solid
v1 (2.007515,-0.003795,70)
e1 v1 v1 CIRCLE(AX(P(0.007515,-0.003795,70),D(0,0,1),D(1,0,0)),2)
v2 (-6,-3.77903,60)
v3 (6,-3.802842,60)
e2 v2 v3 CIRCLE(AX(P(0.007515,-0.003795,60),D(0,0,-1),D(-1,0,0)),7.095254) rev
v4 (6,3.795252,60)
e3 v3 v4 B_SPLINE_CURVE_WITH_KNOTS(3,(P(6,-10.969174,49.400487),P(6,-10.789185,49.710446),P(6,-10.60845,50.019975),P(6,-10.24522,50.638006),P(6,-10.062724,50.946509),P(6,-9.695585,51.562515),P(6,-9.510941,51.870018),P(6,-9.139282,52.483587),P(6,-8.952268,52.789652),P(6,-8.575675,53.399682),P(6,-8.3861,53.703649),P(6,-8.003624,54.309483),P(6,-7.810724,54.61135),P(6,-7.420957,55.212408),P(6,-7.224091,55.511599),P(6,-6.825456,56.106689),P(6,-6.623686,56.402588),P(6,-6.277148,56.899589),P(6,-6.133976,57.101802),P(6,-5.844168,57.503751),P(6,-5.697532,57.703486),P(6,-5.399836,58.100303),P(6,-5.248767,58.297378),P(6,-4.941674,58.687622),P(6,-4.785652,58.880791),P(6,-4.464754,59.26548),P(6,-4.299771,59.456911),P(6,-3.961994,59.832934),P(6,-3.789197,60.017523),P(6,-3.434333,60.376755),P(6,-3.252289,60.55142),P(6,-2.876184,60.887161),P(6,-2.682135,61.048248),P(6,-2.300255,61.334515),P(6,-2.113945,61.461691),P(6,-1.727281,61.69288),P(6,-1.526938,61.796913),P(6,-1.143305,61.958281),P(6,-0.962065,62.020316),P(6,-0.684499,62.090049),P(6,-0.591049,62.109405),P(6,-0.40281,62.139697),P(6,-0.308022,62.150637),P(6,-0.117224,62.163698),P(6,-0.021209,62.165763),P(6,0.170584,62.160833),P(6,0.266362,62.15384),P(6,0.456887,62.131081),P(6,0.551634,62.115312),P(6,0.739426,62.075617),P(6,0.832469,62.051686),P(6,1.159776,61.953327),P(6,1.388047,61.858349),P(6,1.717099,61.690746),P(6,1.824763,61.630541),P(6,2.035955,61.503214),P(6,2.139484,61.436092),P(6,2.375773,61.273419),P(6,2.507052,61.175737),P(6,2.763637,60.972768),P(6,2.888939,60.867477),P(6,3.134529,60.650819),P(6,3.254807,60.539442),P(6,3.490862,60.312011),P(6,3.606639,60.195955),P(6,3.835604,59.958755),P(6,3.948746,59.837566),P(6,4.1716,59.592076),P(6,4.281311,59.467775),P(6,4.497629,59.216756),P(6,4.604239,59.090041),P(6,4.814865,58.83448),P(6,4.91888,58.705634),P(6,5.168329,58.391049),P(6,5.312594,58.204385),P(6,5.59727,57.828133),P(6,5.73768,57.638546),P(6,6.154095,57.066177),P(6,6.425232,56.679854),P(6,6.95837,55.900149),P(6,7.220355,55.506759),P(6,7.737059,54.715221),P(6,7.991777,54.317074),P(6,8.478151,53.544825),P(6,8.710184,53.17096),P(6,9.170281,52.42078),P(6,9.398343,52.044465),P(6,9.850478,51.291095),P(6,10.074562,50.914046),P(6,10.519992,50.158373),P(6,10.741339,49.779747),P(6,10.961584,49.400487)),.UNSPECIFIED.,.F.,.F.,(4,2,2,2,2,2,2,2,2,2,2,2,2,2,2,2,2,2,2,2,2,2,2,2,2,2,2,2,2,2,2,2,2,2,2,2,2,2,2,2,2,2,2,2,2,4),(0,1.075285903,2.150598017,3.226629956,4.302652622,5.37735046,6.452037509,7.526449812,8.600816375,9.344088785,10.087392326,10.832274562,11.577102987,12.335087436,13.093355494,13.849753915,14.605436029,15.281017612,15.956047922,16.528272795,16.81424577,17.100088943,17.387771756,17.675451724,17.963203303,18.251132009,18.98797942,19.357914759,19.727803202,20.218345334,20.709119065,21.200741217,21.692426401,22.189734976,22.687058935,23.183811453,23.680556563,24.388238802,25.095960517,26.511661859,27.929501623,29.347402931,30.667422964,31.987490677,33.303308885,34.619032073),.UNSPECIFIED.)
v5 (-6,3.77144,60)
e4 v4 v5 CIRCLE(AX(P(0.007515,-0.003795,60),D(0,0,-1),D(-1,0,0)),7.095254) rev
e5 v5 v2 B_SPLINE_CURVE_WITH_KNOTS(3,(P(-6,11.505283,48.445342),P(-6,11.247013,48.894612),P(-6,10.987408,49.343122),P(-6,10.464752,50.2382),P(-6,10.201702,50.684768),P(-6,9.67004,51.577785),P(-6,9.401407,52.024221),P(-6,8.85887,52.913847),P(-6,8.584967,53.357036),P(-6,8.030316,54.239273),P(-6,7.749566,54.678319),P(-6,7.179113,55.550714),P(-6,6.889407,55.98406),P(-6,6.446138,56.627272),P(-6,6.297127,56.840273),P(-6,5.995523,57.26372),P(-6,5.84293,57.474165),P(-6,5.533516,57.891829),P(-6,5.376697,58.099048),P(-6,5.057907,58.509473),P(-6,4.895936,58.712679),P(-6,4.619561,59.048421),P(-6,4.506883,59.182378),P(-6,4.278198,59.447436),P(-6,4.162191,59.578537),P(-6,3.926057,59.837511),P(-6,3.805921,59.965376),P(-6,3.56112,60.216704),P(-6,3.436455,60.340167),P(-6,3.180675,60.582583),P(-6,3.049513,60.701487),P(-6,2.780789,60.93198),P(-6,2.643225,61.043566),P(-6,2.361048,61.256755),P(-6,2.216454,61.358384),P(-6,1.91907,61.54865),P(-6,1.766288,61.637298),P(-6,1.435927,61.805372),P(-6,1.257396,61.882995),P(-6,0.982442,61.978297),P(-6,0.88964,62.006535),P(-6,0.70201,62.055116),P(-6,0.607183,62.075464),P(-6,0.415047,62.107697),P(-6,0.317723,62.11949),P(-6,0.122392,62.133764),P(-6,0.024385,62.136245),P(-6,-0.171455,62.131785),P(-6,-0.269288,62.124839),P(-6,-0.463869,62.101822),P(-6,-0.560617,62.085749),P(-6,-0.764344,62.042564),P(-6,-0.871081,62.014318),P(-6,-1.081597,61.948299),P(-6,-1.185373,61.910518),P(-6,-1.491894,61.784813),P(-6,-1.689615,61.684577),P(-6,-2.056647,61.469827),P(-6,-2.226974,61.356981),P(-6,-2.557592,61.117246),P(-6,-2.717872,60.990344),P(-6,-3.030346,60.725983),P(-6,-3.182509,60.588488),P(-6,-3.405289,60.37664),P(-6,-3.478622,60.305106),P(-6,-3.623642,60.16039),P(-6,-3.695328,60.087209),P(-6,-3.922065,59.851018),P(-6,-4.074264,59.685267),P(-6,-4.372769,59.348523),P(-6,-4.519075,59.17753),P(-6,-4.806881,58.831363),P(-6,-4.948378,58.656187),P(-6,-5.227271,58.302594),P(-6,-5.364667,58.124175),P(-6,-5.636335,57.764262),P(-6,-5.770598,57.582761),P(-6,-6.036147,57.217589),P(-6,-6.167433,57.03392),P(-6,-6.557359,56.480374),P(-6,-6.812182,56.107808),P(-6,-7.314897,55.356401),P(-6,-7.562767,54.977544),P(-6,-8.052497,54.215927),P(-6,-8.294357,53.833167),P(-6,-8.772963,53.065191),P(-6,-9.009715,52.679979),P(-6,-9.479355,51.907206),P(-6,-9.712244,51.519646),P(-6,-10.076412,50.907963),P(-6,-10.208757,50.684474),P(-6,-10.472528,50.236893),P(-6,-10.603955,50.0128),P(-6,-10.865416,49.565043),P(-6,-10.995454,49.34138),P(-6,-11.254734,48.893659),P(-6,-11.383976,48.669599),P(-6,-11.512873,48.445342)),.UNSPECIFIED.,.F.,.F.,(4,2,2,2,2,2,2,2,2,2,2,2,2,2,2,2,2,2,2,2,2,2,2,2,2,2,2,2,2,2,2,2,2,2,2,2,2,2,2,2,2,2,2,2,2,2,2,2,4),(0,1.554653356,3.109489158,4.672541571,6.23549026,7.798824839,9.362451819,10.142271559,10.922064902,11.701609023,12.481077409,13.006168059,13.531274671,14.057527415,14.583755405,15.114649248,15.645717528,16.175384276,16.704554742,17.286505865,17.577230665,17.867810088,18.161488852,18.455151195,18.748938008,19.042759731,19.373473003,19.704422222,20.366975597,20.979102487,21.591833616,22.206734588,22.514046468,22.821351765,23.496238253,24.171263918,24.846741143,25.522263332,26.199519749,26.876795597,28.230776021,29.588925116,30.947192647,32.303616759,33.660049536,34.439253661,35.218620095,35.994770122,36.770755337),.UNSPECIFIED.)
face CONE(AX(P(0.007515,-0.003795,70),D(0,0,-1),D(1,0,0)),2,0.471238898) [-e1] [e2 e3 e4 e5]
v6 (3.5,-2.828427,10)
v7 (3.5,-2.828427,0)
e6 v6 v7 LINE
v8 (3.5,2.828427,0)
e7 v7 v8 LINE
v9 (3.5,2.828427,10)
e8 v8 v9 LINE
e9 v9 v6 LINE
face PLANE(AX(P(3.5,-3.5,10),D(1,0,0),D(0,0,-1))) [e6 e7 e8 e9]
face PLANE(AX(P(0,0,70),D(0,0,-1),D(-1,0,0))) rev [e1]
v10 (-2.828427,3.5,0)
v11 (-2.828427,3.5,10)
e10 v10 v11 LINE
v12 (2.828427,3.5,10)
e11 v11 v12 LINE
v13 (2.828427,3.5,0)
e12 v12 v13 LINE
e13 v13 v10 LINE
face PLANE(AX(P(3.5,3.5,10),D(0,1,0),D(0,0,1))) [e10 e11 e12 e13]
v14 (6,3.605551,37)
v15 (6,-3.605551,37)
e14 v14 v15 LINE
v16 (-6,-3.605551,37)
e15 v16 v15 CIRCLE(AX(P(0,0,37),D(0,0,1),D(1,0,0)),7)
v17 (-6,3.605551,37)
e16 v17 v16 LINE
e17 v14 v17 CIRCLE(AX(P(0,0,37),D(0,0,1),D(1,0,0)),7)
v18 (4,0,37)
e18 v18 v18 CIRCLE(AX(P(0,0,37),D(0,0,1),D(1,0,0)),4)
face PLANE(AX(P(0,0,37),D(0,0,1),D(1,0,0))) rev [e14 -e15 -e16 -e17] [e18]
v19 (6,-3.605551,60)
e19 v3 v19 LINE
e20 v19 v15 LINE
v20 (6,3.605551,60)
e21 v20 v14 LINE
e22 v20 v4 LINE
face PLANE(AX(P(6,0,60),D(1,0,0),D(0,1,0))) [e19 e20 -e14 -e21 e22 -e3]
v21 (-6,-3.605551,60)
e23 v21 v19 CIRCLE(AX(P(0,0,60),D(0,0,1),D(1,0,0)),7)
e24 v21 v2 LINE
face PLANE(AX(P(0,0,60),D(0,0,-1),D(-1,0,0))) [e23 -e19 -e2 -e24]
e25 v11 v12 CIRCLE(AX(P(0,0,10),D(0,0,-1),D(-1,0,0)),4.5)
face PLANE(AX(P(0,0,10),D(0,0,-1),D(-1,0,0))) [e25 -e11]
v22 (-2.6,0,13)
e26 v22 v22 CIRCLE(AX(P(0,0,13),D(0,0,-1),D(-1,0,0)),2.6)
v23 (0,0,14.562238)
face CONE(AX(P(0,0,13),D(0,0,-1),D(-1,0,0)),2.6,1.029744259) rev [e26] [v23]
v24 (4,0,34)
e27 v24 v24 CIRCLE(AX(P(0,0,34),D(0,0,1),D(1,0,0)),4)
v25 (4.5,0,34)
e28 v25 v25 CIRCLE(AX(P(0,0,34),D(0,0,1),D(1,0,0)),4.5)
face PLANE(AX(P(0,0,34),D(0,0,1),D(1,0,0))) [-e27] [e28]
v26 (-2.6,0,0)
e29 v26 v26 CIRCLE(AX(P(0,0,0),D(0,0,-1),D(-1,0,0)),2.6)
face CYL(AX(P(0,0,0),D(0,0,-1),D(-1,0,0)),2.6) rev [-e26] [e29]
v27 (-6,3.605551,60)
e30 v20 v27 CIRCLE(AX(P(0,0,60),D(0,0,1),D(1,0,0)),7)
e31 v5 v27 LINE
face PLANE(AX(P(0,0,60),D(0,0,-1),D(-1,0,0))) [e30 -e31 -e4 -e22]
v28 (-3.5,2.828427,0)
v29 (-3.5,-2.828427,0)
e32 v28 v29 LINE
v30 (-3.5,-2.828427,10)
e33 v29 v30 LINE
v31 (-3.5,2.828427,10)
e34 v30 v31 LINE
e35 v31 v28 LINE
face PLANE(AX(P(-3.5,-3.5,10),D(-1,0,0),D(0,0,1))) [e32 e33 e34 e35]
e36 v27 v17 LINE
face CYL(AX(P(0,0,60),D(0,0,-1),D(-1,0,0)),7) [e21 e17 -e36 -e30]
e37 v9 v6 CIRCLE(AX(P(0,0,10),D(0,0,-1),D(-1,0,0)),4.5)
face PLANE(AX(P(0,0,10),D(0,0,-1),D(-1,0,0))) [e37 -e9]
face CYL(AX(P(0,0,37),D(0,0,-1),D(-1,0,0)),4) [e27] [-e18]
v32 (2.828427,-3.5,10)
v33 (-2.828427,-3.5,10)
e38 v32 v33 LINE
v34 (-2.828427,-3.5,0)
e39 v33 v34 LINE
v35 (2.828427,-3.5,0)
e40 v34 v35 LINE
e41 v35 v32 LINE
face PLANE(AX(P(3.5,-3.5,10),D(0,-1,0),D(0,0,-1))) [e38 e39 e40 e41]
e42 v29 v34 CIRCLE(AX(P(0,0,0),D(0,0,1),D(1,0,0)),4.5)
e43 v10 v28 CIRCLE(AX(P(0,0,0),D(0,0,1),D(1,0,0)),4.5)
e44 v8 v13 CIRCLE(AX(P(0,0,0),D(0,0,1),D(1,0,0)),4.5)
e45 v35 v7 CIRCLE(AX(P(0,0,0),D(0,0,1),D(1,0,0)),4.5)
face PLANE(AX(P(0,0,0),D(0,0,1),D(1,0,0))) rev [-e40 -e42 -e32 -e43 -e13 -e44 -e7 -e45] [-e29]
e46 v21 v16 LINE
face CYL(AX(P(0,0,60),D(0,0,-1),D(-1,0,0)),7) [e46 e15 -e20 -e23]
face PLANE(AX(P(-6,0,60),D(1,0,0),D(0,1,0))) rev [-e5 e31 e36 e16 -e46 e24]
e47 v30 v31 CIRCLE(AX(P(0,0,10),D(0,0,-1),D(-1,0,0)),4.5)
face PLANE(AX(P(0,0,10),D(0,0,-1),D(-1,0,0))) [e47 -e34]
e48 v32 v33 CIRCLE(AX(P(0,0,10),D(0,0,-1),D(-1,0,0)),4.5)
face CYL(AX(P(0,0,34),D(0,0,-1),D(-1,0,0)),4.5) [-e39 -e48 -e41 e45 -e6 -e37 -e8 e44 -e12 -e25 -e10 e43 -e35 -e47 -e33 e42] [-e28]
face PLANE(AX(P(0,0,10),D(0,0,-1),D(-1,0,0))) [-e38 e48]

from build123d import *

# Parameters (mm, degrees)
SKETCH_1_R            = 4.5
EXTRUDE_1_DEPTH       = 34
SKETCH_2_R            = 4
EXTRUDE_2_DEPTH       = 3
EXTRUDE_3_DEPTH       = 23
SKETCH_1_2_R          = 2
EXTRUDE_4_DEPTH       = 10
EXTRUDE_4_DRAFT       = 27
SKETCH_7_W            = 1.79623407
SKETCH_7_H            = 9.81557087
SKETCH_7_W_2          = 2.958566665
SKETCH_7_H_2          = 10.839995421
CUT_EXTRUDE_14_DEPTH  = 4
HOLE_WIZARD_M53_D     = 5.2
HOLE_WIZARD_M53_DEPTH = 13
HOLE_WIZARD_M53_TIP   = 1.562237609
SKETCH_16_R           = 10.346676453
SKETCH_16_W           = 7
SKETCH_16_H           = 7
CUT_EXTRUDE_15_DEPTH  = 10


with BuildPart() as part:
    # Эскиз1 → Бобышка-Вытянуть1 (new body)
    with BuildSketch(Plane.XY):
        Circle(SKETCH_1_R)
    extrude(amount=EXTRUDE_1_DEPTH)

    # Эскиз2 → Бобышка-Вытянуть2 (add)
    with BuildSketch(Plane.XY.offset(34)):
        Circle(SKETCH_2_R)
    extrude(amount=EXTRUDE_2_DEPTH)

    # Эскиз3 → Бобышка-Вытянуть3 (add)
    with BuildSketch(Plane.XY.offset(37)):
        with BuildLine():
            ThreePointArc((6, 3.605551275), (0, 7), (-6, 3.605551275))
            Line((-6, 3.605551275), (-6, -3.605551275))
            ThreePointArc((-6, -3.605551275), (0, -7), (6, -3.605551275))
            Line((6, -3.605551275), (6, 3.605551275))
        make_face()
    extrude(amount=EXTRUDE_3_DEPTH)


with BuildPart() as extrude_4_tool:
    # Sketch 1 2 → Бобышка-Вытянуть4 (with draft: the straight prism first)
    with BuildSketch(Plane(origin=(0.00751481, -0.003794932, 70), x_dir=(1, 0, 0), z_dir=(0, 0, 1))):
        Circle(SKETCH_1_2_R)
    extrude(amount=-EXTRUDE_4_DEPTH)
    # Бобышка-Вытянуть4: the draft: its side faces are tilted about the plane it starts from
    extrude_4_sides = [extrude_4_tool.faces().sort_by_distance(p)[0] for p in [
        (-1.99248519, -0.003794932, 65),
    ]]
    draft(extrude_4_sides, Plane(origin=(0.00751481, -0.003794932, 70), x_dir=(1, 0, 0), z_dir=(0, 0, 1)), EXTRUDE_4_DRAFT)


with BuildPart() as part_1:
    add(part.part)

    # Бобышка-Вытянуть4: add extrude_4_tool
    add(extrude_4_tool.part)

    # Эскиз7 → Вырез-Вытянуть14 (cut)
    with BuildSketch(Plane(origin=(0, 0, 60), x_dir=(-1, 0, 0), z_dir=(0, 0, -1))):
        with Locations((-6.898117035, 0.517903439)):
            Rectangle(SKETCH_7_W, SKETCH_7_H)
        with Locations((7.479283333, -1.183503448)):
            Rectangle(SKETCH_7_W_2, SKETCH_7_H_2)
    extrude(amount=-CUT_EXTRUDE_14_DEPTH, mode=Mode.SUBTRACT)

    # Сверло под метчик  спиральное M53
    with Locations(Plane(origin=(0, 0, 0), x_dir=(-1, 0, 0), z_dir=(0, 0, -1))):
        with Locations((0, 0)):
            Hole(HOLE_WIZARD_M53_D / 2, depth=HOLE_WIZARD_M53_DEPTH)
            with Locations((0, 0, -(HOLE_WIZARD_M53_DEPTH + HOLE_WIZARD_M53_TIP / 2))):  # 118° drill point
                Cone(0, HOLE_WIZARD_M53_D / 2, HOLE_WIZARD_M53_TIP, mode=Mode.SUBTRACT)

    # Эскиз16 → Вырез-Вытянуть15 (cut)
    with BuildSketch(Plane(origin=(0, 0, 0), x_dir=(-1, 0, 0), z_dir=(0, 0, -1))):
        Circle(SKETCH_16_R)
        Rectangle(SKETCH_16_W, SKETCH_16_H, mode=Mode.SUBTRACT)
    extrude(amount=-CUT_EXTRUDE_15_DEPTH, mode=Mode.SUBTRACT)


solid = part_1.part
